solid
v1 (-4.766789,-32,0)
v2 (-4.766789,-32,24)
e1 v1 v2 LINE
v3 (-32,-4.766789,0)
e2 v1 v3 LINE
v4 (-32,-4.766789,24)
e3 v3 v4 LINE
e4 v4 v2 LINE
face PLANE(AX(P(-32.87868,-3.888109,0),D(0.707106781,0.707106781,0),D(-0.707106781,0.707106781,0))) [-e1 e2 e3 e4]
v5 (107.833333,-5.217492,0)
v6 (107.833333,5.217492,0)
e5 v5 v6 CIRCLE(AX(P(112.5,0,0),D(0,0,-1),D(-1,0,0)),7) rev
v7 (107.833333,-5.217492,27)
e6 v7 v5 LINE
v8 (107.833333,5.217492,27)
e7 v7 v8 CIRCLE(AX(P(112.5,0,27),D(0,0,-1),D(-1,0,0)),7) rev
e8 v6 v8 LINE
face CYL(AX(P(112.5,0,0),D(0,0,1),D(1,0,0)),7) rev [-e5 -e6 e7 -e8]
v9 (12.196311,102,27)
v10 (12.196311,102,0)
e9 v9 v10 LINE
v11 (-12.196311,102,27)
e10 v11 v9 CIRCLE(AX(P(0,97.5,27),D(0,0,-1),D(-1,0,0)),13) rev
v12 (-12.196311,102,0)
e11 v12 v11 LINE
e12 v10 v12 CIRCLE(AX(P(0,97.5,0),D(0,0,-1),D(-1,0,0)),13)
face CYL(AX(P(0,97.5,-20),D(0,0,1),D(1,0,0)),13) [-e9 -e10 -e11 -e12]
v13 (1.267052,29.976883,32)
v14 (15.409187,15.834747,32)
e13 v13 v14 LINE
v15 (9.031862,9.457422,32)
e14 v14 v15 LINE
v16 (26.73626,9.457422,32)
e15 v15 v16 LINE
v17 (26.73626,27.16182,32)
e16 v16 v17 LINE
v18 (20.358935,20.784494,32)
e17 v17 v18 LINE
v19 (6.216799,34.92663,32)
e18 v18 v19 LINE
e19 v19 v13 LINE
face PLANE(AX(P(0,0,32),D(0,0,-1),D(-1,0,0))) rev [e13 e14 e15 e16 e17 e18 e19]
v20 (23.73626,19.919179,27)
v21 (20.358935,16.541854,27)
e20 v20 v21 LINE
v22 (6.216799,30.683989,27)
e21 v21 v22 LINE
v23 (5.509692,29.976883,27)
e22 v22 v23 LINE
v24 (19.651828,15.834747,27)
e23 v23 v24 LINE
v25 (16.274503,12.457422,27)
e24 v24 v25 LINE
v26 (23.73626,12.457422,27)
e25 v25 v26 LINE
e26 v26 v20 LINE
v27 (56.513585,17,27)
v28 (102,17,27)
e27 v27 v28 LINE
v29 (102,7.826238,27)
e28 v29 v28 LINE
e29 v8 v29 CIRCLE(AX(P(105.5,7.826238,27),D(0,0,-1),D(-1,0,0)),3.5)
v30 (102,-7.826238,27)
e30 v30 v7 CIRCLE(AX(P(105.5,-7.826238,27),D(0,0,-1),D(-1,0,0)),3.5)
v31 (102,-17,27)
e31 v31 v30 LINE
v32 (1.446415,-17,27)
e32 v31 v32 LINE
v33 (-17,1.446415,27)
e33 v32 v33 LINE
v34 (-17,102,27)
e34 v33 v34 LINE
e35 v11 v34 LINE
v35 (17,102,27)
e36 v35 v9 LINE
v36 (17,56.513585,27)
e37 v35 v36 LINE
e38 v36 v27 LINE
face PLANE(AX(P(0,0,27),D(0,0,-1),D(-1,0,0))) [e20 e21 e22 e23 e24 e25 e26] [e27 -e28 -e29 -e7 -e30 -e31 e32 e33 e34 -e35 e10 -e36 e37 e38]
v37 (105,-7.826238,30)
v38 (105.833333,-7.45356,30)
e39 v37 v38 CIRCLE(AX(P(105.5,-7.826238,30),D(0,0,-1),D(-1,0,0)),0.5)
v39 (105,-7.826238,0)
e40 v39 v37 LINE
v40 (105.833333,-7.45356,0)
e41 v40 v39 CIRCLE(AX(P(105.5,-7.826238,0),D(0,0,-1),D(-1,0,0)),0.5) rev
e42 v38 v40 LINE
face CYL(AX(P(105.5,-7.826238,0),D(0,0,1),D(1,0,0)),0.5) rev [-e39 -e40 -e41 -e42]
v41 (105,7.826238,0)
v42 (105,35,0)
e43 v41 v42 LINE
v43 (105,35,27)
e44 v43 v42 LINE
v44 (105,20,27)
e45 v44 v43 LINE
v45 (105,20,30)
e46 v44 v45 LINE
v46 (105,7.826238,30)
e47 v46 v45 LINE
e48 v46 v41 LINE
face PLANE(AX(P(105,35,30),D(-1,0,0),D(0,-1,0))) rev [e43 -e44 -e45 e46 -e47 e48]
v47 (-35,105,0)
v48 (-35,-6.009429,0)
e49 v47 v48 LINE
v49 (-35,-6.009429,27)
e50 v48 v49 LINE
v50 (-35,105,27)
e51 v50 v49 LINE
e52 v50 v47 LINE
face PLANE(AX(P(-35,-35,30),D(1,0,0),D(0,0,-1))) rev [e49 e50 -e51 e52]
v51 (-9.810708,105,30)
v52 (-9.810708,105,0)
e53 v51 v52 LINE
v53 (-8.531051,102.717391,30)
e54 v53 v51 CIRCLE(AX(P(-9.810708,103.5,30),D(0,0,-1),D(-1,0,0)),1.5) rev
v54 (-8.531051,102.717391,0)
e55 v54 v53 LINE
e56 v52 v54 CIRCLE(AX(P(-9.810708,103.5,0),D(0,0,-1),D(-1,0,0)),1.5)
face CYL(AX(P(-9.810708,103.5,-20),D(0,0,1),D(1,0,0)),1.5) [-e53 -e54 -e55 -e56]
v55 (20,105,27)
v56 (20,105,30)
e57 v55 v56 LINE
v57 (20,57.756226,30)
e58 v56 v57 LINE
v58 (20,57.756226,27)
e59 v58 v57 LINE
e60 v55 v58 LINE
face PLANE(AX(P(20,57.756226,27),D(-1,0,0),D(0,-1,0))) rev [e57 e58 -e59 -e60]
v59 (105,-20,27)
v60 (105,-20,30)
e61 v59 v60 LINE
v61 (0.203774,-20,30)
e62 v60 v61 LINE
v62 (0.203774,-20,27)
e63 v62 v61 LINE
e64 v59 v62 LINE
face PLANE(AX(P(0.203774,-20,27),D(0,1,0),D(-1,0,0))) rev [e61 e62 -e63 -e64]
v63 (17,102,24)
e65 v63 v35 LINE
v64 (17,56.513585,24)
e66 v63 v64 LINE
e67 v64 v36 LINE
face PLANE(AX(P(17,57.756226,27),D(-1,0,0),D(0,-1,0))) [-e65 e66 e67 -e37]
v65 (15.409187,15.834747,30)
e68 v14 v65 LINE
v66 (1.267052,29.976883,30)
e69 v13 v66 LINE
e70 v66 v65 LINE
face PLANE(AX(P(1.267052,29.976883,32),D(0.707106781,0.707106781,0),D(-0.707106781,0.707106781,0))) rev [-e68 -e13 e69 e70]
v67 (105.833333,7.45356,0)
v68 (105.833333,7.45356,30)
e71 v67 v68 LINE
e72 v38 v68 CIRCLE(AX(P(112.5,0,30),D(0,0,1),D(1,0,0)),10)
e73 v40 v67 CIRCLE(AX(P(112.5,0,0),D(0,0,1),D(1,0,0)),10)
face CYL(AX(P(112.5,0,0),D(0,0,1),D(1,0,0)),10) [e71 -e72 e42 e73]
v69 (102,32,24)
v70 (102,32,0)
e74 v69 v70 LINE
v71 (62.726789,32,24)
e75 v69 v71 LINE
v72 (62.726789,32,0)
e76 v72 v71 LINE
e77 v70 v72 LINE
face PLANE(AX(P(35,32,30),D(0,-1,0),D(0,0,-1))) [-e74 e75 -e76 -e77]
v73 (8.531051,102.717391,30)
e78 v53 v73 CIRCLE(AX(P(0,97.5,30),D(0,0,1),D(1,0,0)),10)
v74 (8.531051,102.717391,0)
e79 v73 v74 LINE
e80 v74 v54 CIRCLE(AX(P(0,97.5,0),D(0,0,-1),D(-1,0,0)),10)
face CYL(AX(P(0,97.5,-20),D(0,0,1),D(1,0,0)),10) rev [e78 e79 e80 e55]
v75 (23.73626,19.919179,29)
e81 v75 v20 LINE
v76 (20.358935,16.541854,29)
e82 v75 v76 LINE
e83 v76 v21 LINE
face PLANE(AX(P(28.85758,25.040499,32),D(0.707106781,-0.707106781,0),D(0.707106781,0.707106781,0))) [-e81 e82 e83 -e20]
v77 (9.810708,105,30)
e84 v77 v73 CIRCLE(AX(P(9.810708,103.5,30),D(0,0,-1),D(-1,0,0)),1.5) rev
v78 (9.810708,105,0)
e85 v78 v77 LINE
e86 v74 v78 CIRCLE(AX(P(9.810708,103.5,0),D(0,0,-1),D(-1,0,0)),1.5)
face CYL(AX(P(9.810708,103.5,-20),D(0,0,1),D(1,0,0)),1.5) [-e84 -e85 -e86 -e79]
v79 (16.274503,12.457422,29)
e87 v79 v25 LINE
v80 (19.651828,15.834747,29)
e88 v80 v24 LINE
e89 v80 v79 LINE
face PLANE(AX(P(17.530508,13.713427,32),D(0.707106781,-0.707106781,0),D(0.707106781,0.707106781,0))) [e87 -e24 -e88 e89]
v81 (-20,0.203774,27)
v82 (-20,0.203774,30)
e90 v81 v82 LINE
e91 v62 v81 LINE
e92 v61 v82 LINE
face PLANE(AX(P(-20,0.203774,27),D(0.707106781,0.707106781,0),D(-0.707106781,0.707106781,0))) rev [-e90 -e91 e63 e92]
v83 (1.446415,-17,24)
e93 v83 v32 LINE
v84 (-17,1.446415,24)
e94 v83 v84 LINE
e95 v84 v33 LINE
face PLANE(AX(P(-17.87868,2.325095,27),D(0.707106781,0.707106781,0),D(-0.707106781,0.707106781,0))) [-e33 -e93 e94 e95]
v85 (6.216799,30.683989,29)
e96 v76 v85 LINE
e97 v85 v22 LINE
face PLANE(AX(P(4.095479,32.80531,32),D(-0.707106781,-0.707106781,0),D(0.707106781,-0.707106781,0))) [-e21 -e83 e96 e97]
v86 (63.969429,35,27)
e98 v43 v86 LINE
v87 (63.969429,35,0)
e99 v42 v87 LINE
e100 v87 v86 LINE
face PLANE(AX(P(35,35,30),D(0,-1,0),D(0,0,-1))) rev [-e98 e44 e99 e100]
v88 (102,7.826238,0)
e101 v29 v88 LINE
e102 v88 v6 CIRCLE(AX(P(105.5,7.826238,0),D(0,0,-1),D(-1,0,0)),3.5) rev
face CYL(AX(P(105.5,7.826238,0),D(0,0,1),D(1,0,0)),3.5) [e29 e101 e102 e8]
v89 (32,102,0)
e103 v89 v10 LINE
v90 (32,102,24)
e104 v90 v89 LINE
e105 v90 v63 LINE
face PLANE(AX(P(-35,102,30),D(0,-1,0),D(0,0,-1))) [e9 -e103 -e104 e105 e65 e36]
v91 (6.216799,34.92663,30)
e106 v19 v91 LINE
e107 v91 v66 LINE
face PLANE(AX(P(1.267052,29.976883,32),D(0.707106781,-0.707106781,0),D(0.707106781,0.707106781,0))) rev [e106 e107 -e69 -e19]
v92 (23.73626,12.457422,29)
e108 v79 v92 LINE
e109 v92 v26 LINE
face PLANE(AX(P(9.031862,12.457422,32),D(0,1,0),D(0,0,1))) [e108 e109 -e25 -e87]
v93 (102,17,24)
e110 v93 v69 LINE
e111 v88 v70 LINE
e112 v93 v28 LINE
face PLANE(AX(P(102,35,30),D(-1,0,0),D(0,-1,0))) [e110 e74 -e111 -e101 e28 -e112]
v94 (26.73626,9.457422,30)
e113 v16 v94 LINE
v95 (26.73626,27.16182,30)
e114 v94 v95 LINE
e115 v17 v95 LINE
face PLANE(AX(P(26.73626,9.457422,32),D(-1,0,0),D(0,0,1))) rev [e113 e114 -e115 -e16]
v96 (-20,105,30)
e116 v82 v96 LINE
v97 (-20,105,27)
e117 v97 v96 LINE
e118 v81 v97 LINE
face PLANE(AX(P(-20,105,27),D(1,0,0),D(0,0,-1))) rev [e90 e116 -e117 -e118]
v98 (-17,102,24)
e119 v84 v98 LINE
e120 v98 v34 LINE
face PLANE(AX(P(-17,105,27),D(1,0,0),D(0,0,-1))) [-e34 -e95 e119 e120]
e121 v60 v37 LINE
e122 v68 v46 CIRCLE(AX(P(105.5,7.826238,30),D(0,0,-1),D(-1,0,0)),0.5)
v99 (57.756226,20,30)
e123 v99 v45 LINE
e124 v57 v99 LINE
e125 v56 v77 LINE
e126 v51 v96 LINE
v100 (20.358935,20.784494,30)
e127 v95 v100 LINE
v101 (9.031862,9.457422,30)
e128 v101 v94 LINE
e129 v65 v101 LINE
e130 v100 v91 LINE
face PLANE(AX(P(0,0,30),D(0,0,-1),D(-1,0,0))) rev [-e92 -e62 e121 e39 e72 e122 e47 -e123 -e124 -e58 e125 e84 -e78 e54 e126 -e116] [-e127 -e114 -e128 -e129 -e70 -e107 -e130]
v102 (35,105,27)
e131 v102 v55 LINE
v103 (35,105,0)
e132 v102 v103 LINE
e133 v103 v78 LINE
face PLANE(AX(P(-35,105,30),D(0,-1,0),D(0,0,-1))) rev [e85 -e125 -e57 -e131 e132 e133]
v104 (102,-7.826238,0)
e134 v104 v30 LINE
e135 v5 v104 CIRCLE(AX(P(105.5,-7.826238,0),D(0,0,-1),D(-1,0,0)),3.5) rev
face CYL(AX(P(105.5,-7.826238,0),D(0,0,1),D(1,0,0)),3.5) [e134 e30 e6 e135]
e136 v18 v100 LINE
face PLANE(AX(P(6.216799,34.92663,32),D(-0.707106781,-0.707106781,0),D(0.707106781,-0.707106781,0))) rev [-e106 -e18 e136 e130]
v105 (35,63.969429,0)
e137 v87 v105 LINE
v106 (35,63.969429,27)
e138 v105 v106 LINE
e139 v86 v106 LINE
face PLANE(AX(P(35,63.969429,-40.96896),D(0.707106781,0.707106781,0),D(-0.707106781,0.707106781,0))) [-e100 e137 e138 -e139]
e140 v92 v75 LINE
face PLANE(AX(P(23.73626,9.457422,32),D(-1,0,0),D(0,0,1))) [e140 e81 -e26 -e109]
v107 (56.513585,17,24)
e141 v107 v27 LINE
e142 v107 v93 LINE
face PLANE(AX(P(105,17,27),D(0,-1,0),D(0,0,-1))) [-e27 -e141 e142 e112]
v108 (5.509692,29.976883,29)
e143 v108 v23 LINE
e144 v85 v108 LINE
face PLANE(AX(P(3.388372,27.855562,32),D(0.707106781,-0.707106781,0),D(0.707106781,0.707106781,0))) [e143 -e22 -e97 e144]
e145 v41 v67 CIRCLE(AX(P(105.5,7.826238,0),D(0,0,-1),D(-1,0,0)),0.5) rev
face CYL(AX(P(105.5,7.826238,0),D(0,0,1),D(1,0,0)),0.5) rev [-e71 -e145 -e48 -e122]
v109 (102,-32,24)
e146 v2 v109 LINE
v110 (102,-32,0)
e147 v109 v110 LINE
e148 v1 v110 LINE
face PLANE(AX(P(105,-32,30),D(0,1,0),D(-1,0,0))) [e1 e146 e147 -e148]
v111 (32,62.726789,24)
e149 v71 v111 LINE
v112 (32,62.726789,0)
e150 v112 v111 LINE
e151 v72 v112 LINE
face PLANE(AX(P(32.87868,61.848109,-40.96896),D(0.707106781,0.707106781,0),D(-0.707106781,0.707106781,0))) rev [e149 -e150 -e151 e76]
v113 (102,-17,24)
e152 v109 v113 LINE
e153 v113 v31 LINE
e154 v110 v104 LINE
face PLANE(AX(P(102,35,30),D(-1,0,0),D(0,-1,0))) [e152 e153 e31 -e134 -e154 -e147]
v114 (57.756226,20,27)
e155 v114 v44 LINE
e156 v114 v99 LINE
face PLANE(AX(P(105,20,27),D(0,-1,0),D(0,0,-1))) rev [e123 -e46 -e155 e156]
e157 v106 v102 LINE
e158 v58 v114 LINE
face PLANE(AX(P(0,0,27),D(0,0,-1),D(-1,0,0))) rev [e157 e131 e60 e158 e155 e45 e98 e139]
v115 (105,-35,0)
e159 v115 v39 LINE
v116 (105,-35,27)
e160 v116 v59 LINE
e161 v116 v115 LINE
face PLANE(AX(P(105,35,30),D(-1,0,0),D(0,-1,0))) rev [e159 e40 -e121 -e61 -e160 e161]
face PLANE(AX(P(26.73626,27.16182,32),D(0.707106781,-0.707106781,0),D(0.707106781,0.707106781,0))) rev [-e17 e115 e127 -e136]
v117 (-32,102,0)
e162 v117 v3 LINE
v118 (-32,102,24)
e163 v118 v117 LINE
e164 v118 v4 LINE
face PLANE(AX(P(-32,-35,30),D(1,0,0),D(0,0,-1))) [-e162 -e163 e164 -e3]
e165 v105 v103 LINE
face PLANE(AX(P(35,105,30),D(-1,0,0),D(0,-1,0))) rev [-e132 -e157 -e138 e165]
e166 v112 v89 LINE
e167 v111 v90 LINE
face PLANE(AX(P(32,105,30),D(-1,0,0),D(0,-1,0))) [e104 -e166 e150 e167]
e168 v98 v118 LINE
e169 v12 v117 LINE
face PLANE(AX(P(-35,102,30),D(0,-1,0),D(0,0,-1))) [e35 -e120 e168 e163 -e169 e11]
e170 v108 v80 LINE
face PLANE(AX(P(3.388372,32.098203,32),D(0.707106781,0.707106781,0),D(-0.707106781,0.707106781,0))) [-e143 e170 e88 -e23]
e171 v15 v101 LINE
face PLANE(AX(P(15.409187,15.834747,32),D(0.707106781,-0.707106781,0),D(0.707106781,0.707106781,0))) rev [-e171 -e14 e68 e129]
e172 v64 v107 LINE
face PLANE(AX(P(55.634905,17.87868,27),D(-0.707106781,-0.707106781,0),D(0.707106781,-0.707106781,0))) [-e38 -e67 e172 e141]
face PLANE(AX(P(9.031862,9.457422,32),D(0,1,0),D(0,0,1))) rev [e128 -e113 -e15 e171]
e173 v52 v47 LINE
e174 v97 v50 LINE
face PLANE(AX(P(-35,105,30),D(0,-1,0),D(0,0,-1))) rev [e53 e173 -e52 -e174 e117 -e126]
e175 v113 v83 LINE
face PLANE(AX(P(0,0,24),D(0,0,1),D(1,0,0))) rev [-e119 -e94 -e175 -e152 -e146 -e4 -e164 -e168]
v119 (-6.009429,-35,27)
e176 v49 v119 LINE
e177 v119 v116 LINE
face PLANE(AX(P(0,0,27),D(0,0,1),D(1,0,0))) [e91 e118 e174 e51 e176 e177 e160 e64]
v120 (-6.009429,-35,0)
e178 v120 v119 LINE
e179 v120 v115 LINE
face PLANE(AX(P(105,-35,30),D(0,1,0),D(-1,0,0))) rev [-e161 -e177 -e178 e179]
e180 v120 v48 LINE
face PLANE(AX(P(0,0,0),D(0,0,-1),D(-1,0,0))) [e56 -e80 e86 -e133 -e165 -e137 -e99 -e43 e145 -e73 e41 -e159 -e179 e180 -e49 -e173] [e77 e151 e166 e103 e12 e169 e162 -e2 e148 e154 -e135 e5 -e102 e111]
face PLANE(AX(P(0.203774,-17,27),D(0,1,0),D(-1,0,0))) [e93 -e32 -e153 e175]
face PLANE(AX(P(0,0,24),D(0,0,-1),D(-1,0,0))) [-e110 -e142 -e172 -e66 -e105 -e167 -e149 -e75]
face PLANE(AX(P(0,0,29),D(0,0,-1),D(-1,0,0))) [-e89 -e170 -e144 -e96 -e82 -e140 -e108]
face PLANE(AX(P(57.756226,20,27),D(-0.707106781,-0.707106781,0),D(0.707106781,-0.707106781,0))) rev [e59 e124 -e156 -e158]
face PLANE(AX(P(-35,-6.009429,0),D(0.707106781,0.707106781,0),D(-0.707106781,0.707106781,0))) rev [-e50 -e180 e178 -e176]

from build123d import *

# Parameters (mm, degrees)
BOSS_EXTRU_1_DEPTH      = 30
BOSS_EXTRU_2_DEPTH      = 30
ENL_V_MAT_EXTRU_1_DEPTH = 152.492574075
ESQUISSE4_R             = 10
ENL_V_MAT_EXTRU_2_DEPTH = 50
ESQUISSE5_R             = 10
BOSS_EXTRU_3_DEPTH      = 30
ENL_V_MAT_EXTRU_3_DEPTH = 3
BOSS_EXTRU_4_DEPTH      = 2
CONG_2_R                = 0.5
CONG_3_R                = 1.5
COQUE1_DEPTH            = 24
COQUE1_START            = 24
COQUE1_2_DEPTH          = 3
COQUE1_START_2          = 27
COQUE1_3_DEPTH          = 2


# Read off the part's stored shape, not the designer's step: Coque1
with BuildPart() as part:
    # Esquisse1 → Boss.-Extru.1 (new body)
    with BuildSketch(Plane.XY):
        Polygon((-35, 105), (35, 105), (35, 35), (105, 35), (105, -35), (-35, -35), align=None)
    extrude(amount=BOSS_EXTRU_1_DEPTH)

    # Esquisse2 → Boss.-Extru.2 (add)
    with BuildSketch(Plane.XY.offset(30)):
        Polygon((35, 63.969429202), (63.969429202, 35), (35, 35), align=None)
    extrude(amount=-BOSS_EXTRU_2_DEPTH)

    # Esquisse3 → Enlèv. mat.-Extru.1 (cut, through all)
    with BuildSketch(Plane.XY.offset(30)):
        Polygon((-35, -35), (-6.009429202, -35), (-35, -6.009429202), align=None)
    extrude(amount=-ENL_V_MAT_EXTRU_1_DEPTH, mode=Mode.SUBTRACT)

    # Esquisse4 → Enlèv. mat.-Extru.2 (cut)
    with BuildSketch(Plane.XY.offset(30)):
        with Locations((0, 97.5)):
            Circle(ESQUISSE4_R)
    extrude(amount=-ENL_V_MAT_EXTRU_2_DEPTH, mode=Mode.SUBTRACT)

    # Esquisse5 → Boss.-Extru.3 (add, through all)
    with BuildSketch(Plane.XY.offset(30)):
        with Locations((112.5, 0)):
            Circle(ESQUISSE5_R)
    extrude(amount=-BOSS_EXTRU_3_DEPTH)

    # Esquisse7 → Enlèv. mat.-Extru.3 (cut)
    with BuildSketch(Plane.XY.offset(30)):
        Polygon((20, 57.756225766), (20, 105), (35, 105), (35, 63.969429202), (63.969429202, 35), (105, 35), (105, 20), (57.756225766, 20), align=None)
        Polygon((0.203774234, -20), (105, -20), (105, -35), (-6.009429202, -35), (-35, -6.009429202), (-35, 105), (-20, 105), (-20, 0.203774234), align=None)
    extrude(amount=-ENL_V_MAT_EXTRU_3_DEPTH, mode=Mode.SUBTRACT)

    # Esquisse8 → Boss.-Extru.4 (add)
    with BuildSketch(Plane.XY.offset(30)):
        Polygon((1.267051582, 29.97688251), (6.21679905, 34.926629979), (20.358934674, 20.784494355), (26.736260006, 27.161819687), (26.736260006, 9.457421554), (9.031861873, 9.457421554), (15.409187205, 15.834746887), align=None)
    extrude(amount=BOSS_EXTRU_4_DEPTH)

    # Congé2
    cong_2_edges = [part.edges().sort_by_distance(p)[0] for p in [
        (105, -6.614378278, 15),
        (105, 6.614378278, 15),
    ]]
    fillet(cong_2_edges, radius=CONG_2_R)

    # Congé3
    cong_3_edges = [part.edges().sort_by_distance(p)[0] for p in [
        (6.614378278, 105, 15),
        (-6.614378278, 105, 15),
    ]]
    fillet(cong_3_edges, radius=CONG_3_R)

    # Coque1 outline → Coque1 (cut)
    with BuildSketch(Plane.XY):
        with BuildLine():
            Line((-32, 102), (-32, -4.766788515))
            Line((-32, -4.766788515), (-4.766788515, -32))
            Line((-4.766788515, -32), (102, -32))
            Line((102, -32), (102, -7.826237921))
            ThreePointArc((102, -7.826237921), (104.071130983, -4.631189669), (107.833333333, -5.217491947))
            ThreePointArc((107.833333333, -5.217491947), (119.5, 0), (107.833333333, 5.217491947))
            ThreePointArc((107.833333333, 5.217491947), (104.071130983, 4.631189669), (102, 7.826237921))
            Line((102, 7.826237921), (102, 32))
            Line((102, 32), (62.726788515, 32))
            Line((62.726788515, 32), (32, 62.726788515))
            Line((32, 62.726788515), (32, 102))
            Line((32, 102), (12.196310918, 102))
            ThreePointArc((12.196310918, 102), (0, 84.5), (-12.196310918, 102))
            Line((-12.196310918, 102), (-32, 102))
        make_face()
    extrude(amount=COQUE1_DEPTH, mode=Mode.SUBTRACT)

    # Coque1 2 outline → Coque1 2 (cut)
    with BuildSketch(Plane.XY.offset(COQUE1_START)):
        with BuildLine():
            Line((-12.196310918, 102), (-17, 102))
            Line((-17, 102), (-17, 1.446414921))
            Line((-17, 1.446414921), (1.446414921, -17))
            Line((1.446414921, -17), (102, -17))
            Line((102, -17), (102, -7.826237921))
            ThreePointArc((102, -7.826237921), (104.071130983, -4.631189669), (107.833333333, -5.217491947))
            ThreePointArc((107.833333333, -5.217491947), (119.5, 0), (107.833333333, 5.217491947))
            ThreePointArc((107.833333333, 5.217491947), (104.071130983, 4.631189669), (102, 7.826237921))
            Line((102, 7.826237921), (102, 17))
            Line((102, 17), (56.513585079, 17))
            Line((56.513585079, 17), (17, 56.513585079))
            Line((17, 56.513585079), (17, 102))
            Line((17, 102), (12.196310918, 102))
            ThreePointArc((12.196310918, 102), (0, 84.5), (-12.196310918, 102))
        make_face()
    extrude(amount=COQUE1_2_DEPTH, mode=Mode.SUBTRACT)

    # Coque1 3 outline → Coque1 3 (cut)
    with BuildSketch(Plane.XY.offset(COQUE1_START_2)):
        Polygon((5.509692269, 29.97688251), (19.651827893, 15.834746887), (16.27450256, 12.457421554), (23.736260006, 12.457421554), (23.736260006, 19.919179), (20.358934674, 16.541853668), (6.21679905, 30.683989291), align=None)
    extrude(amount=COQUE1_3_DEPTH, mode=Mode.SUBTRACT)


solid = part.part
